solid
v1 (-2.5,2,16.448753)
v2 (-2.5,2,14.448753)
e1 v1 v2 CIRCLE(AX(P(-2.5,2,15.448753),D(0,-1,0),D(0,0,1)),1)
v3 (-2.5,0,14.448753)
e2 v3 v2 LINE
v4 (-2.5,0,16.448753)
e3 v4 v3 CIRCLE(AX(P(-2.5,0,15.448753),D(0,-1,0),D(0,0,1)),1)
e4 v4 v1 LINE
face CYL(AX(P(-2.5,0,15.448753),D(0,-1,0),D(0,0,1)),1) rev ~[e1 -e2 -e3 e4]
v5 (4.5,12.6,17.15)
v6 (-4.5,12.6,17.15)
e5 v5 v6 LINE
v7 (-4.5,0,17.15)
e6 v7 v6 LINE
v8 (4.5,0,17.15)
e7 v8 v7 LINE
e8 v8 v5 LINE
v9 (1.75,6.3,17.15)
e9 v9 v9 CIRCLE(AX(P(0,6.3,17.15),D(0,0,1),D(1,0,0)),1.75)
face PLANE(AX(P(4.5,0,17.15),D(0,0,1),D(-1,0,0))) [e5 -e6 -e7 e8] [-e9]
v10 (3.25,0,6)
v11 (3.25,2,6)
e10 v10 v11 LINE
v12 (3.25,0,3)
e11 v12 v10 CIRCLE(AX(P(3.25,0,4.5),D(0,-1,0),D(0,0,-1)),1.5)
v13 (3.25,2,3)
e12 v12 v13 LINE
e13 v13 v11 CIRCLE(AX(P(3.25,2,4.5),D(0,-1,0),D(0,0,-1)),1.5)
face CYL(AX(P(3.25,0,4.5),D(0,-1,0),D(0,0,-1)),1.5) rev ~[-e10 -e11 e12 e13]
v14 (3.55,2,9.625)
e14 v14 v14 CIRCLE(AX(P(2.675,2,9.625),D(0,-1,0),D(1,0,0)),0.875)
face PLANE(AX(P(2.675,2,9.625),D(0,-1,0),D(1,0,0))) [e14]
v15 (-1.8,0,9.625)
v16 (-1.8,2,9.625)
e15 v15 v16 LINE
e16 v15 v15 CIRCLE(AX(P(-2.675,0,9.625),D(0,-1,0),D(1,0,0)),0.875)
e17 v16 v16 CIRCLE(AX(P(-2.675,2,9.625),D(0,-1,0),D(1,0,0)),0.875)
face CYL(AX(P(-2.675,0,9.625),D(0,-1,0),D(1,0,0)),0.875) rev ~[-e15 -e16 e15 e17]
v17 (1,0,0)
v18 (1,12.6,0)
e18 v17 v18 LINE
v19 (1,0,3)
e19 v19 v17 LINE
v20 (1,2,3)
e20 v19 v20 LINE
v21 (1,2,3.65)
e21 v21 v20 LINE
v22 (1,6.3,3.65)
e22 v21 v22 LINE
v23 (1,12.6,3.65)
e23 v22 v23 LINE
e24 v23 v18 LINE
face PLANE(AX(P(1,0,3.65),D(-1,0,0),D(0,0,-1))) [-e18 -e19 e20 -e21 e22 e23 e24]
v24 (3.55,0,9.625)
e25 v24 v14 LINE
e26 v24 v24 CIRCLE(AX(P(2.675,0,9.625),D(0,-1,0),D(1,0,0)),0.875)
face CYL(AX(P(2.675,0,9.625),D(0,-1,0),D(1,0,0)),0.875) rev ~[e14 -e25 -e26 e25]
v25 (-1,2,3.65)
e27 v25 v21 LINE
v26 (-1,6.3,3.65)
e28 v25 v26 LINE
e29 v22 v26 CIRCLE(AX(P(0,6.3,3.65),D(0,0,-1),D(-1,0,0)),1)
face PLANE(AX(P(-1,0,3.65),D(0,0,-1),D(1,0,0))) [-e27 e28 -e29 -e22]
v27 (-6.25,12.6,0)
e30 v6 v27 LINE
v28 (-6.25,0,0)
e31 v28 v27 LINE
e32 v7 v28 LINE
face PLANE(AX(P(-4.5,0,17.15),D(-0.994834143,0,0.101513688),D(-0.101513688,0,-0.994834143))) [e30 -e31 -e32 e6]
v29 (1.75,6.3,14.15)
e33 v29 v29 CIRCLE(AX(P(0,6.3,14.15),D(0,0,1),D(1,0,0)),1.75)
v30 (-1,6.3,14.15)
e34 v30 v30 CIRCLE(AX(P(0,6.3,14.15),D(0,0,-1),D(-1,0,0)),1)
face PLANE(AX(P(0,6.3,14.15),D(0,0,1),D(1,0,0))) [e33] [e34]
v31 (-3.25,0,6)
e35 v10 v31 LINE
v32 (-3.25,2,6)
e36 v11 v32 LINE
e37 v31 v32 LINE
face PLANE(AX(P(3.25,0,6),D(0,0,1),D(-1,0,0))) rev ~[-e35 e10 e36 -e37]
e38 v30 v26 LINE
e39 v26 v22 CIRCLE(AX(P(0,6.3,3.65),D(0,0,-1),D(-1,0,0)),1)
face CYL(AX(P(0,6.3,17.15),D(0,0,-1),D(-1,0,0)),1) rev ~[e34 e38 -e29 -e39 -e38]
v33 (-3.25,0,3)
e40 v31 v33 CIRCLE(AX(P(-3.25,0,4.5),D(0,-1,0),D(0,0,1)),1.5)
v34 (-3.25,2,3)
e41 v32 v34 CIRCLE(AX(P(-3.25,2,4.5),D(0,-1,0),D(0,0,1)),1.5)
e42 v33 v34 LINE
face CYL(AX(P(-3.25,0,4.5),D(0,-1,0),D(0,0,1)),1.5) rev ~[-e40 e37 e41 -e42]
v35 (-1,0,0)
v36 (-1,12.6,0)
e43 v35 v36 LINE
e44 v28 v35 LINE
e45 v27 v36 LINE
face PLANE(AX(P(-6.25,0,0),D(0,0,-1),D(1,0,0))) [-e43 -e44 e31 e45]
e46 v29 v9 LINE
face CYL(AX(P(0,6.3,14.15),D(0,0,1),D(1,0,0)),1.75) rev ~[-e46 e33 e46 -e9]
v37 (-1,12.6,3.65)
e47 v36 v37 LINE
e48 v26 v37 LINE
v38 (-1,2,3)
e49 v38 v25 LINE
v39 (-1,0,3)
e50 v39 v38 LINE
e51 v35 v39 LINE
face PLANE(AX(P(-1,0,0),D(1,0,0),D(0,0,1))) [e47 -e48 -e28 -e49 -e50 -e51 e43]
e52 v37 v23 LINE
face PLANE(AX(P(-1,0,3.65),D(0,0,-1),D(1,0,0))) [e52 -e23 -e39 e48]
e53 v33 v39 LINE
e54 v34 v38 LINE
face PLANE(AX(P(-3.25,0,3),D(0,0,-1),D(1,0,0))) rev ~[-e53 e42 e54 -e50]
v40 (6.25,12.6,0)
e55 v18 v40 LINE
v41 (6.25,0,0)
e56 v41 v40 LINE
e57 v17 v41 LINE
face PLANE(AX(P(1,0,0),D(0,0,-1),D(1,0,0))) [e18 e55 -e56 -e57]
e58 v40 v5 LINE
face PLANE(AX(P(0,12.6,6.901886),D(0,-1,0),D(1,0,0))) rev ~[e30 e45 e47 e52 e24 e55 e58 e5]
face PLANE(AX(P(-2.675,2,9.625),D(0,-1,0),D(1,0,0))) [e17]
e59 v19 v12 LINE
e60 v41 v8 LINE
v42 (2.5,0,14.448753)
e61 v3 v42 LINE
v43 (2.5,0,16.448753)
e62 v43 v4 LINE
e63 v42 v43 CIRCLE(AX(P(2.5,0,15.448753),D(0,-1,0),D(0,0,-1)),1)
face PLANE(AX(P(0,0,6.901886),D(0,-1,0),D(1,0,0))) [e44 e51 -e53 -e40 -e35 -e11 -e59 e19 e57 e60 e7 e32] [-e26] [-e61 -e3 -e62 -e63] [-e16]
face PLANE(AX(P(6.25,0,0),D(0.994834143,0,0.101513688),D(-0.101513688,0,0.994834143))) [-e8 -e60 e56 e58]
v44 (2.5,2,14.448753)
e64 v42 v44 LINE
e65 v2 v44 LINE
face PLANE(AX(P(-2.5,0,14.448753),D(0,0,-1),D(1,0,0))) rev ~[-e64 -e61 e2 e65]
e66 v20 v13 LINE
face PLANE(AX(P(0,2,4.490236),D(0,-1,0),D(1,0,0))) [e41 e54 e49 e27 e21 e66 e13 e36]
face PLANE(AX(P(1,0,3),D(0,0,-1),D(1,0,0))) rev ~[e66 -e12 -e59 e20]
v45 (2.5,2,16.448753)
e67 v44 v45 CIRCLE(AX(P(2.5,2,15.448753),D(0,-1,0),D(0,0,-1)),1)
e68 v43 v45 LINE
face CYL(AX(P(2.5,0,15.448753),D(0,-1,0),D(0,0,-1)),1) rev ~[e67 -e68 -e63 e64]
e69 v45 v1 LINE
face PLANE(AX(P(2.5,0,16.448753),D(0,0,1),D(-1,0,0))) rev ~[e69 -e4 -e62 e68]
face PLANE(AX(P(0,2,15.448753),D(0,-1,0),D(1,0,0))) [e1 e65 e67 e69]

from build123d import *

# Parameters (mm, degrees)
F0_R           = 0.875
F1_DEPTH       = 12.6
F2_DEPTH       = 2
F4_D           = 2
F4_DEPTH       = 38
F4_CBORE_D     = 3.5
F4_CBORE_DEPTH = 3
F4_TIP         = 0.600860619


# Not quite as in the source:
# - a feature names something its author has since deleted; it is built from what else it names


with BuildPart() as f1:
    # F0 (on Front) → F1 (new body)
    with BuildSketch(Plane.XZ):
        with BuildLine():
            Line((1, 0), (6.25, 0))
            Line((6.25, 0), (4.5, 17.15))
            Line((4.5, 17.15), (0, 17.15))
            Line((0, 17.15), (-4.5, 17.15))
            Line((-4.5, 17.15), (-6.25, 0))
            Line((-6.25, 0), (-1, 0))
            Line((-1, 0), (-1, 3))
            Line((-1, 3), (-3.25, 3))
            ThreePointArc((-3.25, 3), (-4.75, 4.5), (-3.25, 6))
            Line((-3.25, 6), (0, 6))
            Line((0, 6), (3.25, 6))
            ThreePointArc((3.25, 6), (4.75, 4.5), (3.25, 3))
            Line((3.25, 3), (1, 3))
            Line((1, 3), (1, 0))
        make_face()
        with Locations((-2.675, 9.625)):
            Circle(F0_R, mode=Mode.SUBTRACT)
        with Locations((2.675, 9.625)):
            Circle(F0_R, mode=Mode.SUBTRACT)
        with BuildLine():
            Line((-2.5, 16.4487531745), (0, 16.4487531745))
            Line((0, 16.4487531745), (2.5, 16.4487531745))
            ThreePointArc((2.5, 16.4487531745), (3.5, 15.4487531745), (2.5, 14.4487531745))
            Line((2.5, 14.4487531745), (0, 14.4487531745))
            Line((0, 14.4487531745), (-2.5, 14.4487531745))
            ThreePointArc((-2.5, 14.4487531745), (-3.5, 15.4487531745), (-2.5, 16.4487531745))
        make_face(mode=Mode.SUBTRACT)
        with BuildLine():
            Line((2.5, 16.4487531745), (0, 16.4487531745))
            Line((0, 16.4487531745), (-2.5, 16.4487531745))
            ThreePointArc((-2.5, 16.4487531745), (-3.5, 15.4487531745), (-2.5, 14.4487531745))
            Line((-2.5, 14.4487531745), (0, 14.4487531745))
            Line((0, 14.4487531745), (2.5, 14.4487531745))
            ThreePointArc((2.5, 14.4487531745), (3.5, 15.4487531745), (2.5, 16.4487531745))
        make_face()
        with Locations((-2.675, 9.625)):
            Circle(F0_R)
        with Locations((2.675, 9.625)):
            Circle(F0_R)
        with BuildLine():
            Line((1, 3.65), (1, 3))
            Line((1, 3), (3.25, 3))
            ThreePointArc((3.25, 3), (4.75, 4.5), (3.25, 6))
            Line((3.25, 6), (0, 6))
            Line((0, 6), (-3.25, 6))
            ThreePointArc((-3.25, 6), (-4.75, 4.5), (-3.25, 3))
            Line((-3.25, 3), (-1, 3))
            Line((-1, 3), (-1, 3.65))
            Line((-1, 3.65), (0, 3.65))
            Line((0, 3.65), (1, 3.65))
        make_face()
    extrude(amount=-F1_DEPTH)

    # F0 (on Front) → F2 (cut)
    with BuildSketch(Plane.XZ):
        with BuildLine():
            Line((1, 3.65), (1, 3))
            Line((1, 3), (3.25, 3))
            ThreePointArc((3.25, 3), (4.75, 4.5), (3.25, 6))
            Line((3.25, 6), (0, 6))
            Line((0, 6), (-3.25, 6))
            ThreePointArc((-3.25, 6), (-4.75, 4.5), (-3.25, 3))
            Line((-3.25, 3), (-1, 3))
            Line((-1, 3), (-1, 3.65))
            Line((-1, 3.65), (0, 3.65))
            Line((0, 3.65), (1, 3.65))
        make_face()
        with BuildLine():
            Line((2.5, 16.4487531745), (0, 16.4487531745))
            Line((0, 16.4487531745), (-2.5, 16.4487531745))
            ThreePointArc((-2.5, 16.4487531745), (-3.5, 15.4487531745), (-2.5, 14.4487531745))
            Line((-2.5, 14.4487531745), (0, 14.4487531745))
            Line((0, 14.4487531745), (2.5, 14.4487531745))
            ThreePointArc((2.5, 14.4487531745), (3.5, 15.4487531745), (2.5, 16.4487531745))
        make_face()
        with Locations((2.675, 9.625)):
            Circle(F0_R)
        with Locations((-2.675, 9.625)):
            Circle(F0_R)
    extrude(amount=-F2_DEPTH, mode=Mode.SUBTRACT)

    # F4
    with Locations(Plane.XY.offset(17.15)):
        with Locations((0, 6.3)):
            CounterBoreHole(F4_D / 2, F4_CBORE_D / 2, F4_CBORE_DEPTH, depth=F4_DEPTH)
            with Locations((0, 0, -(F4_DEPTH + F4_TIP / 2))):  # 118° drill point
                Cone(0, F4_D / 2, F4_TIP, mode=Mode.SUBTRACT)


solid = f1.part
